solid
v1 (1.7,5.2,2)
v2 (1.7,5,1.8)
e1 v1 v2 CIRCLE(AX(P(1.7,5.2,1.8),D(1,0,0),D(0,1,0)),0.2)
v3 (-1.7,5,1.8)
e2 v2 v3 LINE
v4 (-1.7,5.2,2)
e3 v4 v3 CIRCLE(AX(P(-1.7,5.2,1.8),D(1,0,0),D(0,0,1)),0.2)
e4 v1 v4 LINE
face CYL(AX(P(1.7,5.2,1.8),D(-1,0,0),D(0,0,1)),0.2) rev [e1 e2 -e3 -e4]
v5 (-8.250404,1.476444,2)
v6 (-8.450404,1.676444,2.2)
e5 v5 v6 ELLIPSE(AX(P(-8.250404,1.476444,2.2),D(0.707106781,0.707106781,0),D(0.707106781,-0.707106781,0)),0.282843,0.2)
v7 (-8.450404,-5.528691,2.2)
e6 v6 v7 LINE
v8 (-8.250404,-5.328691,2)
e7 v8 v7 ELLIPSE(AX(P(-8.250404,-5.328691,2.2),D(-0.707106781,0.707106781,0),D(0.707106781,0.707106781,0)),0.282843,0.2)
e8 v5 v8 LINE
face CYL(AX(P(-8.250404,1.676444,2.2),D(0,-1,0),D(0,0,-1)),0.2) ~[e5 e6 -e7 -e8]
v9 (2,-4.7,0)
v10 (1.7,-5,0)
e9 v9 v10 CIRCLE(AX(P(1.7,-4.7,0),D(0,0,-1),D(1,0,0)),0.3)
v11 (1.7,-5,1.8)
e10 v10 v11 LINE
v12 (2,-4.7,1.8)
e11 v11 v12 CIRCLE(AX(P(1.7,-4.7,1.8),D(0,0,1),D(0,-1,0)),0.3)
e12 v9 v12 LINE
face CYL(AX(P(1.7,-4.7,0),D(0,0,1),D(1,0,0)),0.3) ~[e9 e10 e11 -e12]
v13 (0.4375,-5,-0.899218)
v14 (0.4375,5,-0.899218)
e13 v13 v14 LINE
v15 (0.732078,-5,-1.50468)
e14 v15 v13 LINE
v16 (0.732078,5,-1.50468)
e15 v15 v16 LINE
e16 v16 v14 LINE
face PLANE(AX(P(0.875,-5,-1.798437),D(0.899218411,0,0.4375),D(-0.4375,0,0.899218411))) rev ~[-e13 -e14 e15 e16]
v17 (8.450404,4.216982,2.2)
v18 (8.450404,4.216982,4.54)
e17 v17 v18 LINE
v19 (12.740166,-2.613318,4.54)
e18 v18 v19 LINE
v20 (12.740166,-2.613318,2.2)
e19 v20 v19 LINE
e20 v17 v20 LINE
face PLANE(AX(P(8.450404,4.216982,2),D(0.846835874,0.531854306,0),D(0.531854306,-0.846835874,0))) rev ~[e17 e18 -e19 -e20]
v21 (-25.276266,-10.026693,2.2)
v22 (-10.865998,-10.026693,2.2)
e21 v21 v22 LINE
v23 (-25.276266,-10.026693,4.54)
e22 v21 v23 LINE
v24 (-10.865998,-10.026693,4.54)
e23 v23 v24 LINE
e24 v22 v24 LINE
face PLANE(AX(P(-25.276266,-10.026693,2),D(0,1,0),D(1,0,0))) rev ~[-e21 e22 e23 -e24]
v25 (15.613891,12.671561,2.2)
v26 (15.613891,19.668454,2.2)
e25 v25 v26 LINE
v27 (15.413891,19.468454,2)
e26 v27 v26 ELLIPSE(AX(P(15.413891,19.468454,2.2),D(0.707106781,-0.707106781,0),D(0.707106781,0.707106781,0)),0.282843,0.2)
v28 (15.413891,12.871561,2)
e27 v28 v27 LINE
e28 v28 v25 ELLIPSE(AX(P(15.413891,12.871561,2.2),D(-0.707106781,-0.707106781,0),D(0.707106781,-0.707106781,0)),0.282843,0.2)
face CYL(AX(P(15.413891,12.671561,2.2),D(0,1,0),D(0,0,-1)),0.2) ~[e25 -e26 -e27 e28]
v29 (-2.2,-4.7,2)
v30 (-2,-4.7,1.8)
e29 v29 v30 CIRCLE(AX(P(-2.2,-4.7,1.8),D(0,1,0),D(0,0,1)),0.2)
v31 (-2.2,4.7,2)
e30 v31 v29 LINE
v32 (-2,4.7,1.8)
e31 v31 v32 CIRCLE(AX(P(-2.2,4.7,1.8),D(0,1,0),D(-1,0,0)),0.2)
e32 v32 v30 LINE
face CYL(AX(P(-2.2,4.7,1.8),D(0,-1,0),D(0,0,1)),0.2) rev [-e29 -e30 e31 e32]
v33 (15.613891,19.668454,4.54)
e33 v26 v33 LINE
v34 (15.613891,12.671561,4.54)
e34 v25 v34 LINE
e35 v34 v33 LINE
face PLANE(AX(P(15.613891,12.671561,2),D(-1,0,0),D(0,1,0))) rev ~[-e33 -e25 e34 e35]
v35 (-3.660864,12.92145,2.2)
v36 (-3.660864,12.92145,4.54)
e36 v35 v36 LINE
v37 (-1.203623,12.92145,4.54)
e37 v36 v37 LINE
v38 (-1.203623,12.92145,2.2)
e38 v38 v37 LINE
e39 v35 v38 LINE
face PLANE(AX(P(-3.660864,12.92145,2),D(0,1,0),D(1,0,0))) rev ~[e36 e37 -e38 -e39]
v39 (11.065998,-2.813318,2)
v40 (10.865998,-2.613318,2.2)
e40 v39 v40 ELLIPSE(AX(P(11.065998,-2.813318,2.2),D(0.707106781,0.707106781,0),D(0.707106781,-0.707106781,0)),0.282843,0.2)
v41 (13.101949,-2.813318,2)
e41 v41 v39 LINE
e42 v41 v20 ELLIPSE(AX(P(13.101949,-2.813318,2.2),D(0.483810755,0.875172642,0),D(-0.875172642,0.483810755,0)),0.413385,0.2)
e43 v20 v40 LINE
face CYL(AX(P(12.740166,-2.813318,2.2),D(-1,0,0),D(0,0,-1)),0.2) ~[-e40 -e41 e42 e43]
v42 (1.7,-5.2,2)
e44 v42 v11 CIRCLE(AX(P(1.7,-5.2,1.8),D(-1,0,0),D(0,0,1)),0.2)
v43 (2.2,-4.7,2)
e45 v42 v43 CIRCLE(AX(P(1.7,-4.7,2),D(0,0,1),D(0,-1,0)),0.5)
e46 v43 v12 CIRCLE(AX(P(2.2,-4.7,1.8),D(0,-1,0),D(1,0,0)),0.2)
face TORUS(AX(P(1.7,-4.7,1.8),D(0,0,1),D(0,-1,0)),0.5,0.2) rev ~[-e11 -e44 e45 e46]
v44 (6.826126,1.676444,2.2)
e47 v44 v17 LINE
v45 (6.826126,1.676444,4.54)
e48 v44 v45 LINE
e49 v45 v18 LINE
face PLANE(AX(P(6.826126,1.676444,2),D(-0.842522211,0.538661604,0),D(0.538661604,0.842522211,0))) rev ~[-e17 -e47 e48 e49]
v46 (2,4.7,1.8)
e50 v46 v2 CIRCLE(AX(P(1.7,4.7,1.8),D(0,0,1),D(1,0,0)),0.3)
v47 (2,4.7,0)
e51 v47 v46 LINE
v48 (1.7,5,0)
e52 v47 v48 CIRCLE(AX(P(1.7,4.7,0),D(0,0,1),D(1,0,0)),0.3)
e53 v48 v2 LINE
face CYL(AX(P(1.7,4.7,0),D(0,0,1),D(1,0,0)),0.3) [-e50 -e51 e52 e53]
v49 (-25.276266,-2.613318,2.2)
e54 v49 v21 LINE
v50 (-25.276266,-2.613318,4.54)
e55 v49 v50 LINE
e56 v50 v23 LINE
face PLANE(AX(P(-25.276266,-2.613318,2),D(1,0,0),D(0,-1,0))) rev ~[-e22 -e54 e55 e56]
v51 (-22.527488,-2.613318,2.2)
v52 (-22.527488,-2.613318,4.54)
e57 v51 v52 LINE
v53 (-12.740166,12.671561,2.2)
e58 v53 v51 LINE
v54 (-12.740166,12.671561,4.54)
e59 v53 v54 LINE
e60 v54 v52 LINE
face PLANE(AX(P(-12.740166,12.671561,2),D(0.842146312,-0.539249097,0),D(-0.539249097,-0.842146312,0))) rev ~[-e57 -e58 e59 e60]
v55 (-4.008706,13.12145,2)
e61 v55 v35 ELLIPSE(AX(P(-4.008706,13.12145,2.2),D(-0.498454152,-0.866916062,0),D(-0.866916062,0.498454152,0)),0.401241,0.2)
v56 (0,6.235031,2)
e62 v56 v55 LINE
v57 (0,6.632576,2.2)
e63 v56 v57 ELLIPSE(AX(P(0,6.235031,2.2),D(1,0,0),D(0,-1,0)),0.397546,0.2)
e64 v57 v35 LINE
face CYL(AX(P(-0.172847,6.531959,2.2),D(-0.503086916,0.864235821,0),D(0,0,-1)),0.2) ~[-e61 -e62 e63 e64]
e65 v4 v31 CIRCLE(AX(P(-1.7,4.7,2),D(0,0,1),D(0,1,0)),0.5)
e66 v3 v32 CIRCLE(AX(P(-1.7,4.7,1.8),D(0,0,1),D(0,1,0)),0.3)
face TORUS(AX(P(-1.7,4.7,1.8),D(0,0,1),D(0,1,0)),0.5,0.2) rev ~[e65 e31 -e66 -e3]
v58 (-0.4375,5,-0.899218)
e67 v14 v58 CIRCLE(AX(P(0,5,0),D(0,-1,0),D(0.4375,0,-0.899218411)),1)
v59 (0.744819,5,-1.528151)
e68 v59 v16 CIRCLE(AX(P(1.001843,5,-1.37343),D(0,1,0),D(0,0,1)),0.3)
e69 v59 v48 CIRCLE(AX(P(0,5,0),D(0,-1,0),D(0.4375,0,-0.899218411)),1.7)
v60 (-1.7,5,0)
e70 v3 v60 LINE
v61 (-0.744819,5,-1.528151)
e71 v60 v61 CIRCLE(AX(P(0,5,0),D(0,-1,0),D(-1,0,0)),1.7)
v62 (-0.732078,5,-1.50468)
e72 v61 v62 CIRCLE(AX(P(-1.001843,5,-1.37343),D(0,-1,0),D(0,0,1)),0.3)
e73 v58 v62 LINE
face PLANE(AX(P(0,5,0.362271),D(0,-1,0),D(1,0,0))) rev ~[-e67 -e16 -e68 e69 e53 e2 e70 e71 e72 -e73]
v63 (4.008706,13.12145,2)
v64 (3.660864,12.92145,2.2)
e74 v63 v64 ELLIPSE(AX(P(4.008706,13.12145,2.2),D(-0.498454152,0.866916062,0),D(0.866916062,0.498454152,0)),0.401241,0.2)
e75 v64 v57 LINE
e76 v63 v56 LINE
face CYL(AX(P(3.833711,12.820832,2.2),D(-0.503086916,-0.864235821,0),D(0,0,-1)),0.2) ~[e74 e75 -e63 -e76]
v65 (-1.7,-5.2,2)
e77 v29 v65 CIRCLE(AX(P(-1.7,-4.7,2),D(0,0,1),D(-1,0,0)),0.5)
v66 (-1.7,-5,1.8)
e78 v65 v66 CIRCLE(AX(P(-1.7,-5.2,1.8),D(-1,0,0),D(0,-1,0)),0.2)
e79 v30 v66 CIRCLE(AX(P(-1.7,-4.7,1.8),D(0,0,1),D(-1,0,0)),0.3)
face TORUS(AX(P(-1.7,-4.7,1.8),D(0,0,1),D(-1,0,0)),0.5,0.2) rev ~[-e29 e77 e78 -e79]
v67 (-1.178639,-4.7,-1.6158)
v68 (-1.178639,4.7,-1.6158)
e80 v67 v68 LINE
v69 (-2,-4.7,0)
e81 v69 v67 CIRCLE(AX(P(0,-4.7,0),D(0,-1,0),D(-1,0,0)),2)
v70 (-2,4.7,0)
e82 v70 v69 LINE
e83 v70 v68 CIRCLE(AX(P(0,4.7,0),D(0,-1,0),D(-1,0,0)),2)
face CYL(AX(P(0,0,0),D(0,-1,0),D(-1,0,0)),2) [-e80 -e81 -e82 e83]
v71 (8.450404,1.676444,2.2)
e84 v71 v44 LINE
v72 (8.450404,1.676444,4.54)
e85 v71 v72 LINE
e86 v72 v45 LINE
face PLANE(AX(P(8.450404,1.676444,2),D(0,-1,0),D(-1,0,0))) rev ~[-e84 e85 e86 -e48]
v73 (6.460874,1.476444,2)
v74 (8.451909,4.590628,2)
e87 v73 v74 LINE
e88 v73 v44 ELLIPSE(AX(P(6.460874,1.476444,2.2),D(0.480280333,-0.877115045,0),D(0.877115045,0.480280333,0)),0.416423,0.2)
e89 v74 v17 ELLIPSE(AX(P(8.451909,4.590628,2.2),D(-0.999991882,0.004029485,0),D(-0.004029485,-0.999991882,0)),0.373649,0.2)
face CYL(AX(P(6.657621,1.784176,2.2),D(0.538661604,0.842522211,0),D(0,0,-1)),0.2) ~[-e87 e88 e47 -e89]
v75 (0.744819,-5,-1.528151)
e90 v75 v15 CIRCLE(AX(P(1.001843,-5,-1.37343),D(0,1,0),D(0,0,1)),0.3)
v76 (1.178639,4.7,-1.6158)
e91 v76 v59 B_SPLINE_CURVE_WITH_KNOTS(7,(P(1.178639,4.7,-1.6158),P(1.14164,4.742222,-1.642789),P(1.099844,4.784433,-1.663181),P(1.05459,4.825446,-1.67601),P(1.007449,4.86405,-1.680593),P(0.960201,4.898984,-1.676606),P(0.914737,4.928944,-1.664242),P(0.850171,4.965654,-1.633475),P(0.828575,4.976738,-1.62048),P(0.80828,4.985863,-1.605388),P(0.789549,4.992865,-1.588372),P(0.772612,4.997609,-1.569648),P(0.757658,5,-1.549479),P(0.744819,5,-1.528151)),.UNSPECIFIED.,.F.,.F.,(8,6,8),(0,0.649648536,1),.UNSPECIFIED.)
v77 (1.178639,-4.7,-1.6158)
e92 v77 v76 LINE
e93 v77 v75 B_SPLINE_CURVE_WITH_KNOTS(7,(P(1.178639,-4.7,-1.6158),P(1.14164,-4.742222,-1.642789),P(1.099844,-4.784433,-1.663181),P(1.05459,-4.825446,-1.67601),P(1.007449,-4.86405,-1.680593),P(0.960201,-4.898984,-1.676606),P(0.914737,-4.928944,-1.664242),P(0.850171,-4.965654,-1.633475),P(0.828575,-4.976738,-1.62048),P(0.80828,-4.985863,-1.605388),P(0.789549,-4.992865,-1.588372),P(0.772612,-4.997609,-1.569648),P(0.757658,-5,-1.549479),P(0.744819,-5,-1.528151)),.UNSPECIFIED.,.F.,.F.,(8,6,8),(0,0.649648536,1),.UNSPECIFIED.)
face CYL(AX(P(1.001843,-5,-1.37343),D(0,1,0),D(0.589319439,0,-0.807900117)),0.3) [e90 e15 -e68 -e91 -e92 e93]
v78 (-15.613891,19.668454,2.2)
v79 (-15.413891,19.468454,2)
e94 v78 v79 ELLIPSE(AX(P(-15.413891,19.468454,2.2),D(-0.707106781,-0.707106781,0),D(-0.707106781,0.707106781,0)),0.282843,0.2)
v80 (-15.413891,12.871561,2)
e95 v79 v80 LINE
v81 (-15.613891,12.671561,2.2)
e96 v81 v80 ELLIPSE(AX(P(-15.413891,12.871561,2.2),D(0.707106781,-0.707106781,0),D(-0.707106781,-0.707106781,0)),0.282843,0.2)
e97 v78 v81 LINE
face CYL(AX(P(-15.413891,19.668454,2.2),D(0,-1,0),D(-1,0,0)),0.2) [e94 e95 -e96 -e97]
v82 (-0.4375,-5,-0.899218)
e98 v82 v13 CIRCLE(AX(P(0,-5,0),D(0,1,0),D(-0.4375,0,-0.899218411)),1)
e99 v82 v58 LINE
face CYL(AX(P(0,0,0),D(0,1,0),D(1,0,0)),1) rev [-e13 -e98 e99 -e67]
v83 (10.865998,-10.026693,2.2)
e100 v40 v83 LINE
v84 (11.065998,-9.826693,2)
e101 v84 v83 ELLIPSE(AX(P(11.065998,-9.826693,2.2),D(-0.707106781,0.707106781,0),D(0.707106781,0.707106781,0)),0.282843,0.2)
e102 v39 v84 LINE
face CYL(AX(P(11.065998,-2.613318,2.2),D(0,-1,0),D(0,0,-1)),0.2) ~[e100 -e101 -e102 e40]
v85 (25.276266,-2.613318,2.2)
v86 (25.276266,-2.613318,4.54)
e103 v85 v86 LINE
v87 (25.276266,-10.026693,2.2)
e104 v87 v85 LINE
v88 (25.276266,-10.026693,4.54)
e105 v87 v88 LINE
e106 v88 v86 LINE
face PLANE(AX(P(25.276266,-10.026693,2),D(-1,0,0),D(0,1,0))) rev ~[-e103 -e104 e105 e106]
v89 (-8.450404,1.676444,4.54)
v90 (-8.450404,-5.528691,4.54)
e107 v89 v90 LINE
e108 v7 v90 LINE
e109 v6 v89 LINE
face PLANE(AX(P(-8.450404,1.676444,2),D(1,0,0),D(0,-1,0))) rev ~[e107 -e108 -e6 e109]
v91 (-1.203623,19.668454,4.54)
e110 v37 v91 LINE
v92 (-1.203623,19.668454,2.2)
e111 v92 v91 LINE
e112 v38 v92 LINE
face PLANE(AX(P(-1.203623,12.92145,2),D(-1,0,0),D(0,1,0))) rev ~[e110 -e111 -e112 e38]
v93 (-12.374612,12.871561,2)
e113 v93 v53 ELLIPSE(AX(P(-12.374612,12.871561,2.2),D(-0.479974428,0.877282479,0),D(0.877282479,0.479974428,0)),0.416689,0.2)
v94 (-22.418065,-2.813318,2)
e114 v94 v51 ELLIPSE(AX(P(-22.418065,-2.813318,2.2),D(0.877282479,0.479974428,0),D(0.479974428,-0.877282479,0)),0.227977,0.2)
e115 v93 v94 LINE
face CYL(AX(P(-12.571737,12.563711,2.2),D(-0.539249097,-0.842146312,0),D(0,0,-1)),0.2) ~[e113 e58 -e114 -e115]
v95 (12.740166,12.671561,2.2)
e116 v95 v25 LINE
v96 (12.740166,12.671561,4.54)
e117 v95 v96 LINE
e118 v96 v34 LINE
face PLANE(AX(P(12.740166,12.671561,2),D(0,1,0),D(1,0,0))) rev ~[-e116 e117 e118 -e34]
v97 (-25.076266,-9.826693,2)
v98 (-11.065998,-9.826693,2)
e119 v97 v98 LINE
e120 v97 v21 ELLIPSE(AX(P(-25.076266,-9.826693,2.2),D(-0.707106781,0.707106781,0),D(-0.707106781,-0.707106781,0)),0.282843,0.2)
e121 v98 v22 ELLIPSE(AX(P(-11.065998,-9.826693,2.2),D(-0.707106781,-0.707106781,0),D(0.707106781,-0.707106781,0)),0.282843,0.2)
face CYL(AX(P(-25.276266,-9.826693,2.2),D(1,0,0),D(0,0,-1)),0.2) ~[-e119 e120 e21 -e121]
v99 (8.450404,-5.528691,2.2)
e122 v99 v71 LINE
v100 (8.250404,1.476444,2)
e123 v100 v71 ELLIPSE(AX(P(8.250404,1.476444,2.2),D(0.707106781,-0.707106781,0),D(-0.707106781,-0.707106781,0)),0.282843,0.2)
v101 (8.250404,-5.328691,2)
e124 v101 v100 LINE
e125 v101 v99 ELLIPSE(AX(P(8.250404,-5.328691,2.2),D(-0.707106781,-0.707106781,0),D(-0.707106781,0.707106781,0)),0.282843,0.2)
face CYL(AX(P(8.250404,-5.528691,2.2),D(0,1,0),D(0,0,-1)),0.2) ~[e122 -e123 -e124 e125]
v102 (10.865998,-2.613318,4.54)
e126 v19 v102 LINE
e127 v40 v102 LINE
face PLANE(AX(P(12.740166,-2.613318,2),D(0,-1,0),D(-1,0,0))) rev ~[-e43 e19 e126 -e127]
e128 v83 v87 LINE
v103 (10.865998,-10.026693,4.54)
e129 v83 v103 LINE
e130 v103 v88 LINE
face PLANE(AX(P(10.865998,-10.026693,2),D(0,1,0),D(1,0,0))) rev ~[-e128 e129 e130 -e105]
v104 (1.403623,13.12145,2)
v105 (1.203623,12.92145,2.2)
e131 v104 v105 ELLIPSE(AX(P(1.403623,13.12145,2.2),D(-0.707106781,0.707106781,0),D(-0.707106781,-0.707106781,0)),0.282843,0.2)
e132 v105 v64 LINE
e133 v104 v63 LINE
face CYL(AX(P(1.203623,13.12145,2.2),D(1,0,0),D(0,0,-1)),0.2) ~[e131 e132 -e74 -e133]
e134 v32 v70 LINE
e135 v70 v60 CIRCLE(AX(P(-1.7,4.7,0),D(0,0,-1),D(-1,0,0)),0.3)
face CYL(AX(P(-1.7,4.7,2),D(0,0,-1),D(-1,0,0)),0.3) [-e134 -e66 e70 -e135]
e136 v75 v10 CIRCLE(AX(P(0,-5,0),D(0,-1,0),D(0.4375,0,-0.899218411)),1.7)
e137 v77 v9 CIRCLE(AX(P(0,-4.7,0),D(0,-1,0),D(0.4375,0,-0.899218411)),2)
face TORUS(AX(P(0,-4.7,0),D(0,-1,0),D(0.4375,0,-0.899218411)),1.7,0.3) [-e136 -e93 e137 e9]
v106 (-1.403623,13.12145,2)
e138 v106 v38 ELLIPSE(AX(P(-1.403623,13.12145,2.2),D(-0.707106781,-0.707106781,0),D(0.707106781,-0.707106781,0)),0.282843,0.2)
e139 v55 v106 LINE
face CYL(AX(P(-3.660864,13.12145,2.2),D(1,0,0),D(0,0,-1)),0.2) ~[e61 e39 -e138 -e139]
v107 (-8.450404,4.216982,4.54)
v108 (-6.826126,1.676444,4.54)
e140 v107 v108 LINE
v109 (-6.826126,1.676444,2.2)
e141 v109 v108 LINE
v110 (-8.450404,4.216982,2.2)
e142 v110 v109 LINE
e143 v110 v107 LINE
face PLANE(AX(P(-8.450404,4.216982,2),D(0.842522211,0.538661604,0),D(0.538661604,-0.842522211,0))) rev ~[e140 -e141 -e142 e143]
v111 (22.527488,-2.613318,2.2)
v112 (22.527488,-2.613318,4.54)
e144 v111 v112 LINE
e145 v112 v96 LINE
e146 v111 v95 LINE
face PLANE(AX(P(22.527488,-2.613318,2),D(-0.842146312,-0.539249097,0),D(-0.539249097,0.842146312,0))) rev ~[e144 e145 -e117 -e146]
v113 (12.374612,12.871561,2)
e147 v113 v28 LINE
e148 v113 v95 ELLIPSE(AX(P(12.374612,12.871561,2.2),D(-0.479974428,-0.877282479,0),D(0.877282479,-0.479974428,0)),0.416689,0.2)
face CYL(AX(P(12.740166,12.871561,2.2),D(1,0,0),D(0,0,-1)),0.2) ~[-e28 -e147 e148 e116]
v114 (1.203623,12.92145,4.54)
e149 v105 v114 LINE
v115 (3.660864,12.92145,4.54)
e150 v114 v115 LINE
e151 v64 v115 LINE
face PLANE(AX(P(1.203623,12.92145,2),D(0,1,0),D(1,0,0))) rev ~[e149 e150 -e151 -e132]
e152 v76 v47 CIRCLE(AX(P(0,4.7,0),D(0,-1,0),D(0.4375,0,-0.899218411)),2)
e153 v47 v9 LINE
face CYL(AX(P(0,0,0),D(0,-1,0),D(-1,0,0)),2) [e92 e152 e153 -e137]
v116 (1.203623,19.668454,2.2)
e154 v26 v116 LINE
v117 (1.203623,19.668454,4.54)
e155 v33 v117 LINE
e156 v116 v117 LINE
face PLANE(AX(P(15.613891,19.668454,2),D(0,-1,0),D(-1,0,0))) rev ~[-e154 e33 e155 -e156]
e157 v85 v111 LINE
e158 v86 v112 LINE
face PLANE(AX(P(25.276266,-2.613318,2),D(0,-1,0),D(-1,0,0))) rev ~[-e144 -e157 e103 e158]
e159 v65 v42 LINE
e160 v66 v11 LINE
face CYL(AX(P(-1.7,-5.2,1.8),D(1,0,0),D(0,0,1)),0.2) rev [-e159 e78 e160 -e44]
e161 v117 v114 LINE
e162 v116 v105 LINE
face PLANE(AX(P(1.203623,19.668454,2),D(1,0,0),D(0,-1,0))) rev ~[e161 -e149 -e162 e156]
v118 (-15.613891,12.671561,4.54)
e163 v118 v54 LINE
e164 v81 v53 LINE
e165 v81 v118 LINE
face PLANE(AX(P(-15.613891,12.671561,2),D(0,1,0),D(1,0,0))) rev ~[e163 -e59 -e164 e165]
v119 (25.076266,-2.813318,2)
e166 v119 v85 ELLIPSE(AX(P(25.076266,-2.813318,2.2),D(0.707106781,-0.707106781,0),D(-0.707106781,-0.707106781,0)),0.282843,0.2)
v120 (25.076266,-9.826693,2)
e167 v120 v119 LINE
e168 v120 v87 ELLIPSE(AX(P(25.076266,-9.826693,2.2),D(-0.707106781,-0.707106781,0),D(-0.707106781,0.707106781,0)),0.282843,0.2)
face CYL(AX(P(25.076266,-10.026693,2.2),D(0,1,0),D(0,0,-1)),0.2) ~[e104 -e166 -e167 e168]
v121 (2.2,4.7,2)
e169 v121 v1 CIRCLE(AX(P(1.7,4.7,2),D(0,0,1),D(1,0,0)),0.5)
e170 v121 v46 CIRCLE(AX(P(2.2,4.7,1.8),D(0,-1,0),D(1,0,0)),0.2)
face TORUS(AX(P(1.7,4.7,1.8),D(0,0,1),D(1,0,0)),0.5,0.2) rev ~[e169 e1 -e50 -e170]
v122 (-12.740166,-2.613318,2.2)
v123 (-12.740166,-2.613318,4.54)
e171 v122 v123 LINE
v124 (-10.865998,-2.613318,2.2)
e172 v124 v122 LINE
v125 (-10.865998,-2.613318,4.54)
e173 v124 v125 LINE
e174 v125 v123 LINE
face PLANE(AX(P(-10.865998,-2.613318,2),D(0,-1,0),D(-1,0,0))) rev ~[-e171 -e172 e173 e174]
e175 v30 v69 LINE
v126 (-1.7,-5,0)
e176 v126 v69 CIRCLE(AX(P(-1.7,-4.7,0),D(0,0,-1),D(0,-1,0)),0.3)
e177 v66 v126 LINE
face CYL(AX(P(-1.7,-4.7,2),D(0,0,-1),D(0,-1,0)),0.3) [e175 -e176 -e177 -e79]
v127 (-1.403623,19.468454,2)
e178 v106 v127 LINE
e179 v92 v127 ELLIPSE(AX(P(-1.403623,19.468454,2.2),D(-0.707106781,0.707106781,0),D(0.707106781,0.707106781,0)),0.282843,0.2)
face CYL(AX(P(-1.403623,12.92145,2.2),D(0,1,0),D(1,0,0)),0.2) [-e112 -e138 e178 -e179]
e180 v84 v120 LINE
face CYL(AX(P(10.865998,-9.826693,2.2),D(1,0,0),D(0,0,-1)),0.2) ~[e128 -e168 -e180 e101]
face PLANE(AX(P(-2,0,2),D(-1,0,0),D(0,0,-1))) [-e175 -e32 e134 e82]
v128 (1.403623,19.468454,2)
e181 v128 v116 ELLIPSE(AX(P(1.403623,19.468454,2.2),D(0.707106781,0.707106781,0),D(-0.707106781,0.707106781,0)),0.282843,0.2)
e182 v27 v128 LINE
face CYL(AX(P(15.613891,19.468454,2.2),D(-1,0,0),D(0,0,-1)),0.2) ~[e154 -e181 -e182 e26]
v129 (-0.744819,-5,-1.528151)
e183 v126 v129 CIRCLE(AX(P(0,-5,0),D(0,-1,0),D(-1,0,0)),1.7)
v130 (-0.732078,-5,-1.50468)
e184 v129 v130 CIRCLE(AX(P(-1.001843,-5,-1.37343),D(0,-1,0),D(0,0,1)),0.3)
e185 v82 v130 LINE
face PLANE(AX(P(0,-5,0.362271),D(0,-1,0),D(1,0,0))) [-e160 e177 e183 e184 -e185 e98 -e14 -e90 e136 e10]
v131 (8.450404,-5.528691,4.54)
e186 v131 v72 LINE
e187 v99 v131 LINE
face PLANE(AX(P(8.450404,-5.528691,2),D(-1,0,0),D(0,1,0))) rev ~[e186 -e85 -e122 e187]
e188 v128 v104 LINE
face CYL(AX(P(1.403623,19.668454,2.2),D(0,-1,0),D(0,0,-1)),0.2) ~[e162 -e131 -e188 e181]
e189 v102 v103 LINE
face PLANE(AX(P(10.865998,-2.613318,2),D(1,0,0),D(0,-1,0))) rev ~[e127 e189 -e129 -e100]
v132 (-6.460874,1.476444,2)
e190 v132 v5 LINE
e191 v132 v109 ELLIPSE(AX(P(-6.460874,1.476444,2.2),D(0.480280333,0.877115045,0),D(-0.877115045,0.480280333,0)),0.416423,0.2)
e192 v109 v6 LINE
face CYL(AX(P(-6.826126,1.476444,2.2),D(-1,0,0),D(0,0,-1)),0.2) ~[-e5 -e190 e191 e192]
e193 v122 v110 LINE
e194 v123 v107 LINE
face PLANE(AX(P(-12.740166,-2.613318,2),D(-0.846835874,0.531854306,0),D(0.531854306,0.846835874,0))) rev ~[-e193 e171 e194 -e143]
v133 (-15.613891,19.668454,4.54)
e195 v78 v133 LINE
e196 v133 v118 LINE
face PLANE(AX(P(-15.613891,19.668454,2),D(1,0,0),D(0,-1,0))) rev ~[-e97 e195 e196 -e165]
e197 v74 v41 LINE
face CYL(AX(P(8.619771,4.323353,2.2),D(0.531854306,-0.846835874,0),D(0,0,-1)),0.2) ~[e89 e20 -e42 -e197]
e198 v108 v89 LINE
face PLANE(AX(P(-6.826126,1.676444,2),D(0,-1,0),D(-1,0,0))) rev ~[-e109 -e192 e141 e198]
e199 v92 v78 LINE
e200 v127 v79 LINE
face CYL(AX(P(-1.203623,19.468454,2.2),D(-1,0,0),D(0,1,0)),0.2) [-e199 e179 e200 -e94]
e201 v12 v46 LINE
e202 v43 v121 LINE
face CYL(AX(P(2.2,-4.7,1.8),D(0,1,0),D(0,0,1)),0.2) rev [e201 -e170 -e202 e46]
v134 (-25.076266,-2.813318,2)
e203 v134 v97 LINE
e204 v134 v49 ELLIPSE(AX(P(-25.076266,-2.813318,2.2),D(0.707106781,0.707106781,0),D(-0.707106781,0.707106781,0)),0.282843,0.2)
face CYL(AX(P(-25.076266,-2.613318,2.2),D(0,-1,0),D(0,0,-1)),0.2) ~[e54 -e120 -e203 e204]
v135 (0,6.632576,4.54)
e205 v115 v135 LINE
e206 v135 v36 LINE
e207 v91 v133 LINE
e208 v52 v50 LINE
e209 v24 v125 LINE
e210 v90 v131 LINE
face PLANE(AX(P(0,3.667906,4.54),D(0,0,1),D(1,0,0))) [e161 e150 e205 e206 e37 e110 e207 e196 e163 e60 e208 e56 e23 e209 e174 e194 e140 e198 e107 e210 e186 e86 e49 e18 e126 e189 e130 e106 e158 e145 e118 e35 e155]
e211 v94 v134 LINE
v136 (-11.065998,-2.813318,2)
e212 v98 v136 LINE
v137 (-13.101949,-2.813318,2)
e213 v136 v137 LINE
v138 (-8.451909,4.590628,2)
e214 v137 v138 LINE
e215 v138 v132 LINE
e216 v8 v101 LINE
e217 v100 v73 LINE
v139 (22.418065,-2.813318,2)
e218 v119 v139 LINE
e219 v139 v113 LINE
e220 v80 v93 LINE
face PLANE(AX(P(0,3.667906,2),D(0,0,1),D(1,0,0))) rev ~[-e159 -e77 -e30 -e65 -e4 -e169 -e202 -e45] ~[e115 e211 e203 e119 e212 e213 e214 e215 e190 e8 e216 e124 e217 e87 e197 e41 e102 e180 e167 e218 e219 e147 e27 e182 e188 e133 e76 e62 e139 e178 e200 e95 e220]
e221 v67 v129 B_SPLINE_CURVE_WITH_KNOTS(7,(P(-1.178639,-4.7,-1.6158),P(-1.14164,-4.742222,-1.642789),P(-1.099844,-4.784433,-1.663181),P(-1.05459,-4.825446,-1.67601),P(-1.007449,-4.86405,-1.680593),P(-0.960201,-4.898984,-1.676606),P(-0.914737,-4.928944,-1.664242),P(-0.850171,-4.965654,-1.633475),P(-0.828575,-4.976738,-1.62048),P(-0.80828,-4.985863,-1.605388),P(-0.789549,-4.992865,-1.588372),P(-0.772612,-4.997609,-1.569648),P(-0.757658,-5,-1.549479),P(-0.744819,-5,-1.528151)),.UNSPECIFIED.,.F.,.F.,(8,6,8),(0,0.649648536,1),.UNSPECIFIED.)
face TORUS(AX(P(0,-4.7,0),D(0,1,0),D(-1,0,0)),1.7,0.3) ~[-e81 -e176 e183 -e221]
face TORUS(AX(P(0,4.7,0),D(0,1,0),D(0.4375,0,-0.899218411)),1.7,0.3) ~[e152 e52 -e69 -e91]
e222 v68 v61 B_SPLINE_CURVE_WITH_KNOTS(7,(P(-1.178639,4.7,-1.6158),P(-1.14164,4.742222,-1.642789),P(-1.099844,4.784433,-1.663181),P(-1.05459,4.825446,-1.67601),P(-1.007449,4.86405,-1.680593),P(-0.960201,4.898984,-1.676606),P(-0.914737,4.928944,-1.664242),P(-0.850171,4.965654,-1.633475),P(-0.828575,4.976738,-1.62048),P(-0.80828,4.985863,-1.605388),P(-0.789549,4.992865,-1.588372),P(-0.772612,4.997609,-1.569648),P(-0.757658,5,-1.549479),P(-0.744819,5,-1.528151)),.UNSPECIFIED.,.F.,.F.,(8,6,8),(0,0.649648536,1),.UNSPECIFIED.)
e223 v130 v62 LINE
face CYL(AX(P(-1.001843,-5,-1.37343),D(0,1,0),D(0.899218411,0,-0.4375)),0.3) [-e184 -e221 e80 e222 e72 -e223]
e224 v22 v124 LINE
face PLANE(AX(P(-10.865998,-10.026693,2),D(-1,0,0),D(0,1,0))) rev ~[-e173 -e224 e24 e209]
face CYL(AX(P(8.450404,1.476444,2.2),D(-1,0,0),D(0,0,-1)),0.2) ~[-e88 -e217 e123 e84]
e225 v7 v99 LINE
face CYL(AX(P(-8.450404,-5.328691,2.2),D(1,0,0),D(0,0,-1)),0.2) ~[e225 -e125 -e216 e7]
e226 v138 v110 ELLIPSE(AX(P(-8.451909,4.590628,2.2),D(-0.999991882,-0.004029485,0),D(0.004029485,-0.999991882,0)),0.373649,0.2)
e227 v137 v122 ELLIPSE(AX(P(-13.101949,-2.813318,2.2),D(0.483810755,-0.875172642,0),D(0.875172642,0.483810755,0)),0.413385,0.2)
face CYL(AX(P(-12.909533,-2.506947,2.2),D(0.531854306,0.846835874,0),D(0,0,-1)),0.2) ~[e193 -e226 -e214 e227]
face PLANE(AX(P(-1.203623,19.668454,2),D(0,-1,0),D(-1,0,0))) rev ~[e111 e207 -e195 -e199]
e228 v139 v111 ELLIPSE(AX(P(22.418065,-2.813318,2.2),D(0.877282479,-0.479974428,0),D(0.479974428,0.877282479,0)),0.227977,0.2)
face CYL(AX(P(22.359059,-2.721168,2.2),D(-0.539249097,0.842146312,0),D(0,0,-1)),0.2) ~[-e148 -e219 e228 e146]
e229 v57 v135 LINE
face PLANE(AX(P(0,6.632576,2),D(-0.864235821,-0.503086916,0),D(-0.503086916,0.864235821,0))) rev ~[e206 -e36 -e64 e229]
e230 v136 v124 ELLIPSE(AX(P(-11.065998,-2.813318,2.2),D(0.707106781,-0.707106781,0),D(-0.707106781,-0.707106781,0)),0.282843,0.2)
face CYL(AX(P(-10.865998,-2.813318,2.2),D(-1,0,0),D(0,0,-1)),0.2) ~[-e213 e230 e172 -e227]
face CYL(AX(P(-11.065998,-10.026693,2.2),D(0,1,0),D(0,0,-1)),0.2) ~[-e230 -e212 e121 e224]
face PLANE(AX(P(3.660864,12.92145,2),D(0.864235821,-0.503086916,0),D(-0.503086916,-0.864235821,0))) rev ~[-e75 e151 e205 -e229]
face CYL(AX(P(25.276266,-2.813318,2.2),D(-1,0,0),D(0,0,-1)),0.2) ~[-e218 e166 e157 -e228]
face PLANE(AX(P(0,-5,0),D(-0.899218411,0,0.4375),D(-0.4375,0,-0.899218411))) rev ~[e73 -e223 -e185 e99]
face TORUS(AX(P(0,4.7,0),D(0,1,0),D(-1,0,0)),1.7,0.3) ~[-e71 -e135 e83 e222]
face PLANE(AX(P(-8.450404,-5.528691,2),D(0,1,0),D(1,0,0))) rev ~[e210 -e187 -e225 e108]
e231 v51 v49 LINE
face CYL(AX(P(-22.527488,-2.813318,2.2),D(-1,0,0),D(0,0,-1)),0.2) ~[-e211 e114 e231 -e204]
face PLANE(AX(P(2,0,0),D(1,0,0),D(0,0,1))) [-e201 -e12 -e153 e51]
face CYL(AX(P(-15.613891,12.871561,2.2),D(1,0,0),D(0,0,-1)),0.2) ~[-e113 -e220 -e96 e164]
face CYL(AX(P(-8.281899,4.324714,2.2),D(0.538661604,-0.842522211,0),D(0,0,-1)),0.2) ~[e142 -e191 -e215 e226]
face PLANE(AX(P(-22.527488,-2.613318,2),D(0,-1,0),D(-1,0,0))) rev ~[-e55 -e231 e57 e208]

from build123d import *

# Parameters (mm, degrees)
F0_R     = 1
F1_DEPTH = 5
F3_DEPTH = 10.001
F4_R     = 0.3
F6_DEPTH = 2.54
F7_R     = 0.2


with BuildPart() as f1:
    # F0 (on Front) → F1 (new body, symmetric)
    with BuildSketch(Plane.XZ):
        with BuildLine():
            Line((-2, 2), (-2, 0))
            ThreePointArc((-2, 0), (0, -2), (2, 0))
            Line((2, 0), (2, 2))
            Line((2, 2), (0, 2))
            Line((0, 2), (-2, 2))
        make_face()
        Circle(F0_R, mode=Mode.SUBTRACT)
    extrude(amount=F1_DEPTH, both=True)

    # F2 (on face) → F3 (cut, through all)
    with BuildSketch(Plane.XZ.offset(5)):
        with BuildLine():
            Line((0.875, -1.7984368212), (0, 0))
            Line((0, 0), (-0.875, -1.7984368212))
            ThreePointArc((-0.875, -1.7984368212), (0, -2), (0.875, -1.7984368212))
        make_face()
    extrude(amount=-F3_DEPTH, mode=Mode.SUBTRACT)

    # F4
    f4_edges = [f1.edges().sort_by_distance(p)[0] for p in [
        (-0.875, 0, -1.798437),
        (0.875, 0, -1.798437),
        (-1.695582, -5, -1.06066),
        (-2, -5, 1),
        (1.695582, -5, -1.06066),
        (1.695582, 5, -1.06066),
        (2, 5, 1),
        (-1.695582, 5, -1.06066),
        (-2, 5, 1),
        (2, -5, 1),
    ]]
    fillet(f4_edges, radius=F4_R)

    # F5 (on face) → F6 (join)
    with BuildSketch(Plane.XY.offset(2)):
        Polygon((-1.2036230182, 19.6684543043), (-15.6138911843, 19.6684543043), (-15.6138911843, 12.6715609804), (-12.7401659265, 12.6715609804), (-22.5274879485, -2.6133179199), (-25.2762660384, -2.6133179199), (-25.2762660384, -10.0266933441), (-10.8659984544, -10.0266933441), (-10.8659984544, -2.6133179199), (-12.7401659265, -2.6133179199), (-8.4504038095, 4.2169820517), (-6.826125551, 1.676443615), (-8.4504038095, 1.676443615), (-8.4504038095, -5.5286907591), (0, -5.5286907591), (8.4504038095, -5.5286907591), (8.4504038095, 1.676443615), (6.826125551, 1.676443615), (8.4504038095, 4.2169820517), (12.7401659265, -2.6133179199), (10.8659984544, -2.6133179199), (10.8659984544, -10.0266933441), (25.2762660384, -10.0266933441), (25.2762660384, -2.6133179199), (22.5274879485, -2.6133179199), (12.7401659265, 12.6715609804), (15.6138911843, 12.6715609804), (15.6138911843, 19.6684543043), (1.2036230182, 19.6684543043), (1.2036230182, 12.9214497283), (3.6608641967, 12.9214497283), (0, 6.6325762309), (-3.6608641967, 12.9214497283), (-1.2036230182, 12.9214497283), align=None)
        with BuildLine():
            Line((2, 4.7), (2, -4.7))
            ThreePointArc((2, -4.7), (1.9121320344, -4.9121320344), (1.7, -5))
            Line((1.7, -5), (-1.7, -5))
            ThreePointArc((-1.7, -5), (-1.9121320344, -4.9121320344), (-2, -4.7))
            Line((-2, -4.7), (-2, 4.7))
            ThreePointArc((-2, 4.7), (-1.9121320344, 4.9121320344), (-1.7, 5))
            Line((-1.7, 5), (1.7, 5))
            ThreePointArc((1.7, 5), (1.9121320344, 4.9121320344), (2, 4.7))
        make_face(mode=Mode.SUBTRACT)
        with BuildLine():
            ThreePointArc((1.7, -5), (1.9121320344, -4.9121320344), (2, -4.7))
            Line((2, -4.7), (2, 4.7))
            ThreePointArc((2, 4.7), (1.9121320344, 4.9121320344), (1.7, 5))
            Line((1.7, 5), (-1.7, 5))
            ThreePointArc((-1.7, 5), (-1.9121320344, 4.9121320344), (-2, 4.7))
            Line((-2, 4.7), (-2, -4.7))
            ThreePointArc((-2, -4.7), (-1.9121320344, -4.9121320344), (-1.7, -5))
            Line((-1.7, -5), (1.7, -5))
        make_face()
    extrude(amount=F6_DEPTH)

    # F7
    f7_edges = [f1.edges().sort_by_distance(p)[0] for p in [
        (14.177029, 12.671561, 2),
        (17.633827, 5.029122, 2),
        (15.613891, 16.170008, 2),
        (23.901877, -2.613318, 2),
        (8.408757, 19.668454, 2),
        (25.276266, -6.320006, 2),
        (1.203623, 16.294952, 2),
        (18.071132, -10.026693, 2),
        (2.432244, 12.92145, 2),
        (10.865998, -6.320006, 2),
        (1.830432, 9.777013, 2),
        (11.803082, -2.613318, 2),
        (-1.830432, 9.777013, 2),
        (10.595285, 0.801832, 2),
        (-2.432244, 12.92145, 2),
        (7.638265, 2.946713, 2),
        (-1.203623, 16.294952, 2),
        (7.638265, 1.676444, 2),
        (-8.408757, 19.668454, 2),
        (8.450404, -1.926124, 2),
        (-15.613891, 16.170008, 2),
        (0, -5.528691, 2),
        (-14.177029, 12.671561, 2),
        (-8.450404, -1.926124, 2),
        (-17.633827, 5.029122, 2),
        (-7.638265, 1.676444, 2),
        (-23.901877, -2.613318, 2),
        (-7.638265, 2.946713, 2),
        (-25.276266, -6.320006, 2),
        (-10.595285, 0.801832, 2),
        (-18.071132, -10.026693, 2),
        (-11.803082, -2.613318, 2),
        (-10.865998, -6.320006, 2),
        (1.912132, 4.912132, 2),
        (0, 5, 2),
        (-1.912132, 4.912132, 2),
        (-2, 0, 2),
        (-1.912132, -4.912132, 2),
        (0, -5, 2),
        (1.912132, -4.912132, 2),
        (2, 0, 2),
    ]]
    fillet(f7_edges, radius=F7_R)


solid = f1.part
